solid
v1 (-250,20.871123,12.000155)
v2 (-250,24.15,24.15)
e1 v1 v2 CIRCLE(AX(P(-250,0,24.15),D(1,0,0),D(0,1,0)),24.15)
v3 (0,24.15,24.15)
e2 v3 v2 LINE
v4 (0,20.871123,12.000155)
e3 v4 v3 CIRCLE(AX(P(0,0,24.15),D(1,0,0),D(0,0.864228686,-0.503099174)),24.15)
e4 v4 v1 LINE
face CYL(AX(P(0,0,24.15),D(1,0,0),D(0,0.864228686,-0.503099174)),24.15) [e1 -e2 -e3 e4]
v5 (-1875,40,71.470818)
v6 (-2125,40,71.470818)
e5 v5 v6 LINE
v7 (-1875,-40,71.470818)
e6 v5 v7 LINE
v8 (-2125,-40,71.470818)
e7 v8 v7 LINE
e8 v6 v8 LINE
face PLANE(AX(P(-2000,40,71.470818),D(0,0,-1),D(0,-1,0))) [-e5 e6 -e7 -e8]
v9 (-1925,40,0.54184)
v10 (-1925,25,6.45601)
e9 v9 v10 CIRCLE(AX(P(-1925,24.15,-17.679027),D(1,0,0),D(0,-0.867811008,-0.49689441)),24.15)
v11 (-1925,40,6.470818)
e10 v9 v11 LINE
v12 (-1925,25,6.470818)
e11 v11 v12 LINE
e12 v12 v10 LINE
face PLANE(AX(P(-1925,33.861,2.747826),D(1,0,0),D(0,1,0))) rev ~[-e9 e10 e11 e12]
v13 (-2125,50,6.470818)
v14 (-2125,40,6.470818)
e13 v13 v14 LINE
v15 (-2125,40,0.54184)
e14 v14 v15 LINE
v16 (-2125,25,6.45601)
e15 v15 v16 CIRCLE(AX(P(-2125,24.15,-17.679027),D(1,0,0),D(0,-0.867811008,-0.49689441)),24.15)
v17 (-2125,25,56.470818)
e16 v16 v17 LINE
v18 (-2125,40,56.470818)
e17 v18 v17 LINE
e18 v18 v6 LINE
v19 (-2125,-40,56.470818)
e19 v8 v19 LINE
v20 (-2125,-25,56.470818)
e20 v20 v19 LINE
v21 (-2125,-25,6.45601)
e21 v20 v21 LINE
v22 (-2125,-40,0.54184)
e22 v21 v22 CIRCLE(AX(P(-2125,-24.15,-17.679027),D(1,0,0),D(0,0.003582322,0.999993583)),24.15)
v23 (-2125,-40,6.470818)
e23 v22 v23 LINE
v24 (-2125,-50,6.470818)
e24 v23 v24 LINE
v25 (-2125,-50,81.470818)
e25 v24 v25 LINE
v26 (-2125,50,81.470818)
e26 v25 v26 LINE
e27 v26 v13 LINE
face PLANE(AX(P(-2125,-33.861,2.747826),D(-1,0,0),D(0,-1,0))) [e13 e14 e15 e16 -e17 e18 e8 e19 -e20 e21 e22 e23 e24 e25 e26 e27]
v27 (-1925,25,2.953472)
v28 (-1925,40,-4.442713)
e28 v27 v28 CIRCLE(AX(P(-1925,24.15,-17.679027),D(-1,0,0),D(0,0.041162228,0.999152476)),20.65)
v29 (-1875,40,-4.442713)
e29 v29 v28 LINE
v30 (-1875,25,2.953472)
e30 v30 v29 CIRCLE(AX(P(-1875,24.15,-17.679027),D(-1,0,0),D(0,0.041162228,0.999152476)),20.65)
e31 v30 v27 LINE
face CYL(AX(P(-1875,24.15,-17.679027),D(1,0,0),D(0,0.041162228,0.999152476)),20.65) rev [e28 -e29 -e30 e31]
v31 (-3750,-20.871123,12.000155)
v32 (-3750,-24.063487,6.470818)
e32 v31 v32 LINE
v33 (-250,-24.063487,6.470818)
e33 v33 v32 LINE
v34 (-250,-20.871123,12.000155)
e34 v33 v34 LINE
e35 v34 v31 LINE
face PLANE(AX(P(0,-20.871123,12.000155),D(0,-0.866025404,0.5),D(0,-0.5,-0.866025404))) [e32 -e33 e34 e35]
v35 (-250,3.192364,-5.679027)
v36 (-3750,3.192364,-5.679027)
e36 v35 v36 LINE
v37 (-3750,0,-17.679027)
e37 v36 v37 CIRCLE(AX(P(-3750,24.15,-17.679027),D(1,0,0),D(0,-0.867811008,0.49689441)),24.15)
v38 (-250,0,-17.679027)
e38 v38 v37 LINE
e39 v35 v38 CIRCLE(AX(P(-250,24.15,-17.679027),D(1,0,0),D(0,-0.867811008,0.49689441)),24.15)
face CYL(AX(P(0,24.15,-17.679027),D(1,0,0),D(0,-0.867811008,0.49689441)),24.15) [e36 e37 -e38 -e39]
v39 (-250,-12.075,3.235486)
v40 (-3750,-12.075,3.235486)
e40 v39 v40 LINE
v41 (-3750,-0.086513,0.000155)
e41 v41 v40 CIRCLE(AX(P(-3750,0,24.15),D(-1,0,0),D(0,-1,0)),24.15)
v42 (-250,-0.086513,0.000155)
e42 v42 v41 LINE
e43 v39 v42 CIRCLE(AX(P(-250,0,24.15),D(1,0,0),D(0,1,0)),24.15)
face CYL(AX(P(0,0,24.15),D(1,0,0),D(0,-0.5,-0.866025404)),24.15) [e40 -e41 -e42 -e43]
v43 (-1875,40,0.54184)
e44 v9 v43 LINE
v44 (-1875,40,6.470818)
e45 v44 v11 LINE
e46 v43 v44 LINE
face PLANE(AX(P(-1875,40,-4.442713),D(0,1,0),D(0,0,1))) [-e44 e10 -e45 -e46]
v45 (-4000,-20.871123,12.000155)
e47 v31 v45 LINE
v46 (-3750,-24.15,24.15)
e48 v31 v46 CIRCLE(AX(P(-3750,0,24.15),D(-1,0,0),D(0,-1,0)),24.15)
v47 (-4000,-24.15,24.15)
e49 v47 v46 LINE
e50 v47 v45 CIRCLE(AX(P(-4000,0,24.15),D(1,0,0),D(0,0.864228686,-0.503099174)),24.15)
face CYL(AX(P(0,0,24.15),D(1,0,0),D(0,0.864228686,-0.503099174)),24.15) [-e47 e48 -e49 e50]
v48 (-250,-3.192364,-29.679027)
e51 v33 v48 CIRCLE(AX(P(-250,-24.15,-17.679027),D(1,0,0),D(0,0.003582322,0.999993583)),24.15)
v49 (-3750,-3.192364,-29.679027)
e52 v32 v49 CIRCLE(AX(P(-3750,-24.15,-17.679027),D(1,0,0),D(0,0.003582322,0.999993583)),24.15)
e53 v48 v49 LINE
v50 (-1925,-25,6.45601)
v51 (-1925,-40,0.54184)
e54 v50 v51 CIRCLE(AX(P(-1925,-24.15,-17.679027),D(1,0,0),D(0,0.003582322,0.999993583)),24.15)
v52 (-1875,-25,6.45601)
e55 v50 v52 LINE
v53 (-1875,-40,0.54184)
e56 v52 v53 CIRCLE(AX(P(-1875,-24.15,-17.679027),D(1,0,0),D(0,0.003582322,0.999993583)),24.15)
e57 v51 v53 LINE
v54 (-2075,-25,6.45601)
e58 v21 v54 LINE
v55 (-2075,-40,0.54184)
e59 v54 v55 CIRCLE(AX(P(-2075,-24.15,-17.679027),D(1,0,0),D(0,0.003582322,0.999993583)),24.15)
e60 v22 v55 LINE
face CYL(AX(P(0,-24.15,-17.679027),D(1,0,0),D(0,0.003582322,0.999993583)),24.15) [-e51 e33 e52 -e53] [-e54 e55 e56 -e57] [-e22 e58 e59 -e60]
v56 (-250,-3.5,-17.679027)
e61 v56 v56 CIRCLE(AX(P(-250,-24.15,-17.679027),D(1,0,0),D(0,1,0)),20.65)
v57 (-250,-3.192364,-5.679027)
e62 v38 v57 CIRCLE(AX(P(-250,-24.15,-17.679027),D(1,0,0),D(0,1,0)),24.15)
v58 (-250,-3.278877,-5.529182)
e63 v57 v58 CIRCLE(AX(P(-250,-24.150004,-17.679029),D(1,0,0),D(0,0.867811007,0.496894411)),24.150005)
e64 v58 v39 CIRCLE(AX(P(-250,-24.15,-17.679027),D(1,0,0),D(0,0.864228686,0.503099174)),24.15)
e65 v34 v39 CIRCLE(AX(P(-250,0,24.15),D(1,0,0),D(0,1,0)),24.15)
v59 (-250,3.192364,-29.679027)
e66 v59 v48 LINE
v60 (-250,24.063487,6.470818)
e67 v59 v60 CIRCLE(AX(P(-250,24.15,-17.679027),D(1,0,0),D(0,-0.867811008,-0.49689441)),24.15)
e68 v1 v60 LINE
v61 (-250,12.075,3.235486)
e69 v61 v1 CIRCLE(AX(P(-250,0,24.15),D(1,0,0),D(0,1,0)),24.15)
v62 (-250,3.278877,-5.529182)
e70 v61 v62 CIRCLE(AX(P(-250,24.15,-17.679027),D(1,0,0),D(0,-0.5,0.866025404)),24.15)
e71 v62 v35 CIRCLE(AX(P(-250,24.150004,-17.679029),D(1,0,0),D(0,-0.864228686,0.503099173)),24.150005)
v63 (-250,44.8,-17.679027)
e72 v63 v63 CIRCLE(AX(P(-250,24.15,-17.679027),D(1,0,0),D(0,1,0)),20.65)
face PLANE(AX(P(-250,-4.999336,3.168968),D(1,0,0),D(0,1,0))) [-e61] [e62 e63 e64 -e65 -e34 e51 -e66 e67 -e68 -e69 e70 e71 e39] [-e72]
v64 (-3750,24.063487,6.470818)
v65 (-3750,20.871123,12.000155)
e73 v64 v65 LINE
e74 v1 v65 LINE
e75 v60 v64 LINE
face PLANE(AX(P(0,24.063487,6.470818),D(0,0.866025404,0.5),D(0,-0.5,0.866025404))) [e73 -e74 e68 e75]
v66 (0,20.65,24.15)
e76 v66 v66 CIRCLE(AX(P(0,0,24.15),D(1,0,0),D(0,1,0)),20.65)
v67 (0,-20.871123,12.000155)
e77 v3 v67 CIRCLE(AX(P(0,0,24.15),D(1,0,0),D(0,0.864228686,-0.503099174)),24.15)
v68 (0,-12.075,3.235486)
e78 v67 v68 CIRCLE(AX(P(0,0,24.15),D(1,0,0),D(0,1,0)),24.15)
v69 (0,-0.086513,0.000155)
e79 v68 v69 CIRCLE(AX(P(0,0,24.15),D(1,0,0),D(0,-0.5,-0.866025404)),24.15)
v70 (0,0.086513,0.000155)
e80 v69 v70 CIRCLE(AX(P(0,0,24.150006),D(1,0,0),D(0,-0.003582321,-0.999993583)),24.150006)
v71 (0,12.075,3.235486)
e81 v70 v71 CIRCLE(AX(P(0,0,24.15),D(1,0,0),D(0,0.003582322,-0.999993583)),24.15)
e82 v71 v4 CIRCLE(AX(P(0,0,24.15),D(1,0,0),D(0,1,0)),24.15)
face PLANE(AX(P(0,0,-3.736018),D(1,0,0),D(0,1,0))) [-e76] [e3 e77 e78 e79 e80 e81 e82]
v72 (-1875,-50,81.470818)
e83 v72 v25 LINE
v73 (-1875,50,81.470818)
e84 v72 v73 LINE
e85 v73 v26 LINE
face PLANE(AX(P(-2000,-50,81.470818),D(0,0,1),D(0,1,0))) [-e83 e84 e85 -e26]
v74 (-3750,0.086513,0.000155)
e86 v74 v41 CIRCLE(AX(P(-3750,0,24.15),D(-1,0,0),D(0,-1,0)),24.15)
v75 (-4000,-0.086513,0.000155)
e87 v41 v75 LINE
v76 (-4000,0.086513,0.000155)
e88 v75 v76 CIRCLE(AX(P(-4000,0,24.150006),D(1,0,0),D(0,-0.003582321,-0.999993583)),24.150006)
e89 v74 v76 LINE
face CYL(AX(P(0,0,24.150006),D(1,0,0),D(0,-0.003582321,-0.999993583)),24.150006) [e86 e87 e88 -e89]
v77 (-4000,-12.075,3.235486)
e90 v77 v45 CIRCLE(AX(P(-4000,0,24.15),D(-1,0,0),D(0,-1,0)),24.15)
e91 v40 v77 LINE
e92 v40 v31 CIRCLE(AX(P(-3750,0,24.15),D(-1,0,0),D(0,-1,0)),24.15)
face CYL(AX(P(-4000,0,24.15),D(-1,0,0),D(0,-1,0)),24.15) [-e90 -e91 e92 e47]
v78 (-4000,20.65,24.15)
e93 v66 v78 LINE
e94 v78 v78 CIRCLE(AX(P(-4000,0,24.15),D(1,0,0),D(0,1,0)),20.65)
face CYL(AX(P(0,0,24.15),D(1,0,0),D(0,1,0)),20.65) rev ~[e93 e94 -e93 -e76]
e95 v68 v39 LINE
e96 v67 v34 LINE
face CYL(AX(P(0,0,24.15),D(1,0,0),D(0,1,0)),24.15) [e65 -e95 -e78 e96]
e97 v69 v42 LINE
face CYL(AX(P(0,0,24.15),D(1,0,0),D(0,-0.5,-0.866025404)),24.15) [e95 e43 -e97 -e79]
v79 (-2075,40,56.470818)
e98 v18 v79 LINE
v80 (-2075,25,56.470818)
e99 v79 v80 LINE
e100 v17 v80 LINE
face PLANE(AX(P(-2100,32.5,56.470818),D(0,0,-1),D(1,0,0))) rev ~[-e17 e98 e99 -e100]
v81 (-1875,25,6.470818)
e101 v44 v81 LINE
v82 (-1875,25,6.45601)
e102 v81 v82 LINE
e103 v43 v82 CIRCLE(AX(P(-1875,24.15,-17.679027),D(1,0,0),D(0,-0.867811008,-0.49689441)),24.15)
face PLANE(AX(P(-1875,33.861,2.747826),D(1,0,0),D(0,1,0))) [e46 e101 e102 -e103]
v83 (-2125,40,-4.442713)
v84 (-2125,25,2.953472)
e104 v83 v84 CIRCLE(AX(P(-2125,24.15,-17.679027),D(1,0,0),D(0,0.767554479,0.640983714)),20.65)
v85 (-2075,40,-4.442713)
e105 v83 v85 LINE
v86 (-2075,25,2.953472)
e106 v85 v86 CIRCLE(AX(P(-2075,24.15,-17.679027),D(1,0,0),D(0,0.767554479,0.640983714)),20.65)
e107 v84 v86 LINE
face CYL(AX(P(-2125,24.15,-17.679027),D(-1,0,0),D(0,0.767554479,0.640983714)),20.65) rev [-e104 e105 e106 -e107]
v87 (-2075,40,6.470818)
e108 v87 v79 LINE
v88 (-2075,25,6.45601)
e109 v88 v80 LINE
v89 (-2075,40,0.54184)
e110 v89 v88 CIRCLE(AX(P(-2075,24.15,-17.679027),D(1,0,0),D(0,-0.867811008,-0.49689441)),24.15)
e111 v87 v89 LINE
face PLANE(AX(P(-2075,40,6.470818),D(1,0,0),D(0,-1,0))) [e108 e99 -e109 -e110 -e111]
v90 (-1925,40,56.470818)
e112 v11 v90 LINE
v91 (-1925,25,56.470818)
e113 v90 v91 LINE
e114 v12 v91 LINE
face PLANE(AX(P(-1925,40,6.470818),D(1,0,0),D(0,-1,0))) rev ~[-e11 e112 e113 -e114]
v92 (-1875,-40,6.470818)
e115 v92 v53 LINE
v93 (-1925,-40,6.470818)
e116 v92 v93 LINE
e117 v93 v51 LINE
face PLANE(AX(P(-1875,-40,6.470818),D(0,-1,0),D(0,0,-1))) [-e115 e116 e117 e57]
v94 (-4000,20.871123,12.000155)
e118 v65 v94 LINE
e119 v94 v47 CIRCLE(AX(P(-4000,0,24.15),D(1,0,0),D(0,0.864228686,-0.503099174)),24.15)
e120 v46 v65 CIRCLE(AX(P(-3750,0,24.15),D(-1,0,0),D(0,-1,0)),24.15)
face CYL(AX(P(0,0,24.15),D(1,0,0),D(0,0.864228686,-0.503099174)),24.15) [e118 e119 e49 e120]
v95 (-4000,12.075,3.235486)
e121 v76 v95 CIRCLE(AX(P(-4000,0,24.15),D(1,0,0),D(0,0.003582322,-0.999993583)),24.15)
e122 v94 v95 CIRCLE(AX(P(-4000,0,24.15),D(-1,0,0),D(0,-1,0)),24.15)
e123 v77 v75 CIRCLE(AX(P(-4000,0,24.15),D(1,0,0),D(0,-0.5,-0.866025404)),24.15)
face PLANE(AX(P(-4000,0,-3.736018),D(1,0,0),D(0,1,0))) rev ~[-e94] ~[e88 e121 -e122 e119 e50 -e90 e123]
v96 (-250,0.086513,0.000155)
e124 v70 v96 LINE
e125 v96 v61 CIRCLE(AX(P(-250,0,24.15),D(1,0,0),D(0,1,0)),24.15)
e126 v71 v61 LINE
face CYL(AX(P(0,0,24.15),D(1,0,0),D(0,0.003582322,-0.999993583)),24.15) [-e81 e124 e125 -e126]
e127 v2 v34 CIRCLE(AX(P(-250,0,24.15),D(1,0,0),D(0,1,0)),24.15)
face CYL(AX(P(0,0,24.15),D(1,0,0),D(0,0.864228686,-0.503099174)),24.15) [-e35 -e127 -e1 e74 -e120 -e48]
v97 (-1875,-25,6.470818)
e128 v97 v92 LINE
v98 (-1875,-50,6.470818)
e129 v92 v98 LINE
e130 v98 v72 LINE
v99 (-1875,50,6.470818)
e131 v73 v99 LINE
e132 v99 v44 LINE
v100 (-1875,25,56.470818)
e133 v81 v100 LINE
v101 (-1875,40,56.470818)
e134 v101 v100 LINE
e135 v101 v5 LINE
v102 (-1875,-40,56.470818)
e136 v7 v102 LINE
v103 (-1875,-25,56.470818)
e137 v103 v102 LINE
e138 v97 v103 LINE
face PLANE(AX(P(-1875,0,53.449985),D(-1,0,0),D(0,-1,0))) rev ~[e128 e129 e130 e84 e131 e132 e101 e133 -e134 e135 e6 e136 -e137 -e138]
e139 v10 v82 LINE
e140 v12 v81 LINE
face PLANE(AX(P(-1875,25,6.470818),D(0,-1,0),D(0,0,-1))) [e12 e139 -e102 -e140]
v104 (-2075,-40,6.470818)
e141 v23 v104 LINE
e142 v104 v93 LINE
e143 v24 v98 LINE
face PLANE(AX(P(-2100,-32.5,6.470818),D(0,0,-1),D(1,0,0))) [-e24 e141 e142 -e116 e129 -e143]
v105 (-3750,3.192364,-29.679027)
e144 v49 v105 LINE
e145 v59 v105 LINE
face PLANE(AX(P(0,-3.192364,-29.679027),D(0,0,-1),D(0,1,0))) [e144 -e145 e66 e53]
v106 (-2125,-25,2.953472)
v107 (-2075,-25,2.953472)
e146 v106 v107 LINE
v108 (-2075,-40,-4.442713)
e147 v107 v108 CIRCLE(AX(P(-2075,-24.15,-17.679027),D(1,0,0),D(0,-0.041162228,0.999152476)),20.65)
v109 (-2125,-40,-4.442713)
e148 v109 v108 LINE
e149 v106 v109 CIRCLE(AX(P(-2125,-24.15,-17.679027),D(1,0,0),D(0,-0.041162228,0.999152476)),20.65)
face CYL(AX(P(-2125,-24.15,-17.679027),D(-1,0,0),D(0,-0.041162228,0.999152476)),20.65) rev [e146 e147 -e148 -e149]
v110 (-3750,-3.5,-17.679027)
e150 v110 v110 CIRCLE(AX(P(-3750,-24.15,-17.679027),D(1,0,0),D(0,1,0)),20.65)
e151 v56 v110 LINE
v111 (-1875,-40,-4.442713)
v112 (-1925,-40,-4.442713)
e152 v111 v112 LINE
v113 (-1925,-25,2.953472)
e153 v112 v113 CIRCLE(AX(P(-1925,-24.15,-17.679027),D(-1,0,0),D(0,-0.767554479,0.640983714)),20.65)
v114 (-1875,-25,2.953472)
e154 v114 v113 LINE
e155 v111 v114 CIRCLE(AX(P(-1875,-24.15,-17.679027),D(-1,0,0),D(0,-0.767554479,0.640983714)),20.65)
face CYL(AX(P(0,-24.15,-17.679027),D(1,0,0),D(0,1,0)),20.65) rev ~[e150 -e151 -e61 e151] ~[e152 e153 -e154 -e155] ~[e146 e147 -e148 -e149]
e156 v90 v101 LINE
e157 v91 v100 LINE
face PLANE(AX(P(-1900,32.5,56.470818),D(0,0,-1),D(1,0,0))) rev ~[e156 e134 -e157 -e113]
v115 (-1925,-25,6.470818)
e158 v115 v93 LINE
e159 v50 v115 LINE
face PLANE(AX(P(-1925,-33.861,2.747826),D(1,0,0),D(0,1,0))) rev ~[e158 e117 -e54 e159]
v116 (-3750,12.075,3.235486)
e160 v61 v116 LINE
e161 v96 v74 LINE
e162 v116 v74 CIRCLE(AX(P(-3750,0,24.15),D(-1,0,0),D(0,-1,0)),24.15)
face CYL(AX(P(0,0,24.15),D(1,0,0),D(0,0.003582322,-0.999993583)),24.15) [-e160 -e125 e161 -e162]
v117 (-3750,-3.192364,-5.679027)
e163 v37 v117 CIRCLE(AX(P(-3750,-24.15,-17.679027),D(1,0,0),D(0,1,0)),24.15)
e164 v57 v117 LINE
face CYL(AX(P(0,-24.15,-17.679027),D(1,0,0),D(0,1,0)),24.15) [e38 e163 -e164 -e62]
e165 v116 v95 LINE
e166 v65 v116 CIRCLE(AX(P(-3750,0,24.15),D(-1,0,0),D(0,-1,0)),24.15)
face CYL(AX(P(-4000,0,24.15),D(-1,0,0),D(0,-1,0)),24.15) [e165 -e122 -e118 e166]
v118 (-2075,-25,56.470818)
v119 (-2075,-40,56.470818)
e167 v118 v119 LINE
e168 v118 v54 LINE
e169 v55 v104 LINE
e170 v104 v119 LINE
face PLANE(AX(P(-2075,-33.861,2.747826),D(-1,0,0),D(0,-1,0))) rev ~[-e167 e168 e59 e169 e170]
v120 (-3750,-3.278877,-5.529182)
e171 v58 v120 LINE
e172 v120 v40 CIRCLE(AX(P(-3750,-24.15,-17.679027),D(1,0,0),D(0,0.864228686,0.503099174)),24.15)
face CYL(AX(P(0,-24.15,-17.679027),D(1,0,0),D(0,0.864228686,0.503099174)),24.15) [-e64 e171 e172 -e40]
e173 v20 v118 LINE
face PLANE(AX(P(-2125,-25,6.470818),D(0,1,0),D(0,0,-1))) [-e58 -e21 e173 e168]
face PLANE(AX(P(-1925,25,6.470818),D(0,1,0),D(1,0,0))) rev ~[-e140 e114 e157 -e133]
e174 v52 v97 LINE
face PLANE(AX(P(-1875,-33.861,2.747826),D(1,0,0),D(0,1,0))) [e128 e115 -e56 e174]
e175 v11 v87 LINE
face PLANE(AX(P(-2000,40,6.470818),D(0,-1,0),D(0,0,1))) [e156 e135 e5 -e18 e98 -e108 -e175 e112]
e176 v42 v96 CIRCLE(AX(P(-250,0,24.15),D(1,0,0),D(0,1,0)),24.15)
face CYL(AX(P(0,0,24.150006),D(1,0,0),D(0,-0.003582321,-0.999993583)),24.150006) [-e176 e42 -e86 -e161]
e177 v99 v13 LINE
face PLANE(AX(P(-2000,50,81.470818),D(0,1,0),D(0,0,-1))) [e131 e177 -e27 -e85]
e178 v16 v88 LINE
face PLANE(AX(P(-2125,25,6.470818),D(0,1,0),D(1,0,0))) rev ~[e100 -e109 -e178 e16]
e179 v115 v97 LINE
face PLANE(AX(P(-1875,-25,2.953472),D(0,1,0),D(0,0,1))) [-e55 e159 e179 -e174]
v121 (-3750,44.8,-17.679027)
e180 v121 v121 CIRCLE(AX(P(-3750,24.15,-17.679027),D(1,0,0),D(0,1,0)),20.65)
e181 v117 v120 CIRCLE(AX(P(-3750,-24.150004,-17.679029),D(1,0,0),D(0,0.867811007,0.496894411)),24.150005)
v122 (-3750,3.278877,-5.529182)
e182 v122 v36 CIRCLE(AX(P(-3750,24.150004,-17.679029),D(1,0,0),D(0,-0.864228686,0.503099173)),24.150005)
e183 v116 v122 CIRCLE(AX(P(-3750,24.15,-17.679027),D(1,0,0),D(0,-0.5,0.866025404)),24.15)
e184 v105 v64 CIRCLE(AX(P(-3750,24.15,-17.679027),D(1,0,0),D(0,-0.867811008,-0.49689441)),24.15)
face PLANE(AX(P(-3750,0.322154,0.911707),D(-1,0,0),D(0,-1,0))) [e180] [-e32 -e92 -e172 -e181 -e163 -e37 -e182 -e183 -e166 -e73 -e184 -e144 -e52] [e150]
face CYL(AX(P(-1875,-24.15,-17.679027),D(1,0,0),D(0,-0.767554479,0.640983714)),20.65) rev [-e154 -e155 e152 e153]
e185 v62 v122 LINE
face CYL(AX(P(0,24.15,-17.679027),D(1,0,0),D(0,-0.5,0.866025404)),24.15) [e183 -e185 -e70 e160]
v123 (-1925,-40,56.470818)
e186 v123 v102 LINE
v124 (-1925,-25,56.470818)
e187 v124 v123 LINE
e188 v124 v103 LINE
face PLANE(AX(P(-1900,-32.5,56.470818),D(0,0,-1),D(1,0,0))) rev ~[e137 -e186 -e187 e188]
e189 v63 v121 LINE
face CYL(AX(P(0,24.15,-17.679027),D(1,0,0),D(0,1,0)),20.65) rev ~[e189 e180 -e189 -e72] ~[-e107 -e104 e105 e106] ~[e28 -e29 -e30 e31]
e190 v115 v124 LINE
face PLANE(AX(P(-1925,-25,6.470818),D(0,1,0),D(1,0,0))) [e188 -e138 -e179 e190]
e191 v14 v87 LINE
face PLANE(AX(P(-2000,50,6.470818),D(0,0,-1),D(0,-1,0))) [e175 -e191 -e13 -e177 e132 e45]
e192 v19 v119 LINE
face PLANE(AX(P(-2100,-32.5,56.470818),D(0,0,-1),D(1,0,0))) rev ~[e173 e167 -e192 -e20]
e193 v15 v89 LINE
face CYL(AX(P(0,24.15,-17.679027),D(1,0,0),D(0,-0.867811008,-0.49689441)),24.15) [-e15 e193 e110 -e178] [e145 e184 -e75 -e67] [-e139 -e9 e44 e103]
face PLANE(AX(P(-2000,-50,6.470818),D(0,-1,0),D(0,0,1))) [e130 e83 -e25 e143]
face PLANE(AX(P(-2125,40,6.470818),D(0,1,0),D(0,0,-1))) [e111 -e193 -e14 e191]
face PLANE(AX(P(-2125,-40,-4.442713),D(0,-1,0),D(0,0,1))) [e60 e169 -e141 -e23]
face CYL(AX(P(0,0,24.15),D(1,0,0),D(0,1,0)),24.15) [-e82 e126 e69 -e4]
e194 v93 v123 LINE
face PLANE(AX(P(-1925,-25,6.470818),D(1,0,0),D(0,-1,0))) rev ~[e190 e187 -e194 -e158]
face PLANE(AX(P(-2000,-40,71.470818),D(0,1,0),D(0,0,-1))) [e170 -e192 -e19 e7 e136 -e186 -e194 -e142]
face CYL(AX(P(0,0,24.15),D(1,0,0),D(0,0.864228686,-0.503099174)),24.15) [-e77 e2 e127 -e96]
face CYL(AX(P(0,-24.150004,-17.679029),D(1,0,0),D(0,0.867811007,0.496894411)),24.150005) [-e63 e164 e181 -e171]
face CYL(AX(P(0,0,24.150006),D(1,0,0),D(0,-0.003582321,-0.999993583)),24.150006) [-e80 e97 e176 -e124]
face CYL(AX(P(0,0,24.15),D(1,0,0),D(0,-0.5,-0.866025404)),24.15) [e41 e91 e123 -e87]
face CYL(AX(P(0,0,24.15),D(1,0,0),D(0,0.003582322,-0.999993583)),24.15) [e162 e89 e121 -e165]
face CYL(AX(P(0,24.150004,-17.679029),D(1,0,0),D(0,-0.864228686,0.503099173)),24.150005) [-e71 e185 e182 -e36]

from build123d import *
from build123d import SkipClean  # not in build123d's __all__

# Parameters (mm, degrees)
F0_R      = 20.65
F1_DEPTH  = 4000
F2_W      = 120.345171541
F2_H      = 96.7681743205
F2_R      = 24.15
F3_DEPTH  = 250
F4_W      = 149.252615869
F4_H      = 108.2491464913
F4_R      = 24.15
F5_DEPTH  = 250
F9_DEPTH  = 125
F10_W     = 50
F10_H     = 15
F11_DEPTH = 50
F13_DEPTH = 50
F15_DEPTH = 50


# Not quite as in the source:
# - after a boolean that leaves OpenCascade's solid faulty, fix() repairs it


with BuildPart() as f1:
    # F0 (on Right) → F1 (new body)
    with BuildSketch(Plane.YZ):
        with BuildLine():
            Line((-20.8711227654, 12.0001549593), (-24.0634869254, 6.4708180379))
            ThreePointArc((-24.0634869254, 6.4708180379), (-45.0645135014, -29.7540270028), (-3.19236416, -29.6790270028))
            Line((-3.19236416, -29.6790270028), (3.19236416, -29.6790270028))
            ThreePointArc((3.19236416, -29.6790270028), (45.0645135014, -29.7540270028), (24.0634869254, 6.4708180379))
            Line((24.0634869254, 6.4708180379), (20.8711227654, 12.0001549593))
            ThreePointArc((20.8711227654, 12.0001549593), (0, 48.3), (-20.8711227654, 12.0001549593))
        make_face()
        with Locations((-24.15, -17.6790270028)):
            Circle(F0_R, mode=Mode.SUBTRACT)
        with BuildLine():
            ThreePointArc((-12.075, 3.2354864986), (-6.2922525862, 0.8341243486), (-0.0865130746, 0.0001549593))
            ThreePointArc((-0.0865130746, 0.0001549593), (0, 0), (0.0865130746, 0.0001549593))
            ThreePointArc((0.0865130746, 0.0001549593), (6.2922525862, 0.8341243486), (12.075, 3.2354864986))
            ThreePointArc((12.075, 3.2354864986), (7.1039856675, -0.5718385904), (3.2788772346, -5.5291819621))
            ThreePointArc((3.2788772346, -5.5291819621), (3.2354864986, -5.6040270028), (3.19236416, -5.6790270028))
            ThreePointArc((3.19236416, -5.6790270028), (0.8117330813, -11.4703397637), (0, -17.6790270028))
            ThreePointArc((0, -17.6790270028), (-0.8117330813, -11.4703397637), (-3.19236416, -5.6790270028))
            ThreePointArc((-3.19236416, -5.6790270028), (-3.2354864986, -5.6040270028), (-3.2788772346, -5.5291819621))
            ThreePointArc((-3.2788772346, -5.5291819621), (-7.1039856675, -0.5718385904), (-12.075, 3.2354864986))
        make_face(mode=Mode.SUBTRACT)
        with Locations((24.15, -17.6790270028)):
            Circle(F0_R, mode=Mode.SUBTRACT)
        with Locations((0, 24.15)):
            Circle(F0_R, mode=Mode.SUBTRACT)
    extrude(amount=-F1_DEPTH)

    # F2 (on face) → F3 (cut)
    with BuildSketch(Plane(origin=(-4000, 0, 0), x_dir=(0, -1, 0), z_dir=(-1, 0, 0))):
        with Locations((-0.3221537918, 0.9117070585)):
            Rectangle(F2_W, F2_H)
        with Locations((0, 24.15)):
            Circle(F2_R, mode=Mode.SUBTRACT)
    with SkipClean():  # cleaning this boolean's faces spoils the solid; the shape is the same uncleaned
        extrude(amount=-F3_DEPTH, mode=Mode.SUBTRACT)

    # F4 (on face) → F5 (cut)
    with BuildSketch(Plane.YZ):
        with Locations((-4.9993358552, 3.1689684838)):
            Rectangle(F4_W, F4_H)
        with Locations((0, 24.15)):
            Circle(F4_R, mode=Mode.SUBTRACT)
    extrude(amount=-F5_DEPTH, mode=Mode.SUBTRACT)

    add(f1.part.fix(), mode=Mode.REPLACE)



with BuildPart() as f9:
    # F8 (on mid) → F9 (new body, symmetric)
    with BuildSketch(Plane(origin=(-2000, 0, 0), x_dir=(0, -1, 0), z_dir=(-1, 0, 0))):
        Polygon((50, 6.4708180379), (50, 81.4708180379), (-50, 81.4708180379), (-50, 6.4708180379), (-40, 6.4708180379), (-40, 71.4708180379), (40, 71.4708180379), (40, 6.4708180379), align=None)
    extrude(amount=F9_DEPTH, both=True)

    # F10 (on face) → F11 (join)
    with BuildSketch(Plane(origin=(0, 0, 6.4708180379), x_dir=(1, 0, 0), z_dir=(0, 0, -1))):
        with Locations((-2100, 32.5)):
            Rectangle(F10_W, F10_H)
        with Locations((-1900, 32.5)):
            Rectangle(F10_W, F10_H)
        with Locations((-1900, -32.5)):
            Rectangle(F10_W, F10_H)
        with Locations((-2100, -32.5)):
            Rectangle(F10_W, F10_H)
    extrude(amount=-F11_DEPTH)


with BuildPart() as f1_1:
    add(f1.part, clean=False)

    add(f9.part)  # F13 merges F9
    # F12 (on face) → F13 (join, through all)
    with BuildSketch(Plane(origin=(-2125, 0, 0), x_dir=(0, -1, 0), z_dir=(-1, 0, 0))):
        with BuildLine():
            Line((40, 6.4708180379), (25, 6.4708180379))
            Line((25, 6.4708180379), (25, 2.9534716341))
            ThreePointArc((25, 2.9534716341), (33.282271785, 0.8418831272), (40, -4.4427133166))
            Line((40, -4.4427133166), (40, 6.4708180379))
        make_face()
        with BuildLine():
            Line((-25, 6.4708180379), (-40, 6.4708180379))
            Line((-40, 6.4708180379), (-40, -4.4427133166))
            ThreePointArc((-40, -4.4427133166), (-33.282271785, 0.8418831272), (-25, 2.9534716341))
            Line((-25, 2.9534716341), (-25, 6.4708180379))
        make_face()
    extrude(amount=-F13_DEPTH)

    # F14 (on face) → F15 (join, through all)
    with BuildSketch(Plane.YZ.offset(-1875)):
        with BuildLine():
            Line((40, -4.4427133166), (40, 6.4708180379))
            Line((40, 6.4708180379), (25, 6.4708180379))
            Line((25, 6.4708180379), (25, 2.9534716341))
            ThreePointArc((25, 2.9534716341), (33.282271785, 0.8418831272), (40, -4.4427133166))
        make_face()
        with BuildLine():
            Line((-25, 6.4708180379), (-40, 6.4708180379))
            Line((-40, 6.4708180379), (-40, -4.4427133166))
            ThreePointArc((-40, -4.4427133166), (-33.282271785, 0.8418831272), (-25, 2.9534716341))
            Line((-25, 2.9534716341), (-25, 6.4708180379))
        make_face()
    extrude(amount=-F15_DEPTH)


solid = f1_1.part
